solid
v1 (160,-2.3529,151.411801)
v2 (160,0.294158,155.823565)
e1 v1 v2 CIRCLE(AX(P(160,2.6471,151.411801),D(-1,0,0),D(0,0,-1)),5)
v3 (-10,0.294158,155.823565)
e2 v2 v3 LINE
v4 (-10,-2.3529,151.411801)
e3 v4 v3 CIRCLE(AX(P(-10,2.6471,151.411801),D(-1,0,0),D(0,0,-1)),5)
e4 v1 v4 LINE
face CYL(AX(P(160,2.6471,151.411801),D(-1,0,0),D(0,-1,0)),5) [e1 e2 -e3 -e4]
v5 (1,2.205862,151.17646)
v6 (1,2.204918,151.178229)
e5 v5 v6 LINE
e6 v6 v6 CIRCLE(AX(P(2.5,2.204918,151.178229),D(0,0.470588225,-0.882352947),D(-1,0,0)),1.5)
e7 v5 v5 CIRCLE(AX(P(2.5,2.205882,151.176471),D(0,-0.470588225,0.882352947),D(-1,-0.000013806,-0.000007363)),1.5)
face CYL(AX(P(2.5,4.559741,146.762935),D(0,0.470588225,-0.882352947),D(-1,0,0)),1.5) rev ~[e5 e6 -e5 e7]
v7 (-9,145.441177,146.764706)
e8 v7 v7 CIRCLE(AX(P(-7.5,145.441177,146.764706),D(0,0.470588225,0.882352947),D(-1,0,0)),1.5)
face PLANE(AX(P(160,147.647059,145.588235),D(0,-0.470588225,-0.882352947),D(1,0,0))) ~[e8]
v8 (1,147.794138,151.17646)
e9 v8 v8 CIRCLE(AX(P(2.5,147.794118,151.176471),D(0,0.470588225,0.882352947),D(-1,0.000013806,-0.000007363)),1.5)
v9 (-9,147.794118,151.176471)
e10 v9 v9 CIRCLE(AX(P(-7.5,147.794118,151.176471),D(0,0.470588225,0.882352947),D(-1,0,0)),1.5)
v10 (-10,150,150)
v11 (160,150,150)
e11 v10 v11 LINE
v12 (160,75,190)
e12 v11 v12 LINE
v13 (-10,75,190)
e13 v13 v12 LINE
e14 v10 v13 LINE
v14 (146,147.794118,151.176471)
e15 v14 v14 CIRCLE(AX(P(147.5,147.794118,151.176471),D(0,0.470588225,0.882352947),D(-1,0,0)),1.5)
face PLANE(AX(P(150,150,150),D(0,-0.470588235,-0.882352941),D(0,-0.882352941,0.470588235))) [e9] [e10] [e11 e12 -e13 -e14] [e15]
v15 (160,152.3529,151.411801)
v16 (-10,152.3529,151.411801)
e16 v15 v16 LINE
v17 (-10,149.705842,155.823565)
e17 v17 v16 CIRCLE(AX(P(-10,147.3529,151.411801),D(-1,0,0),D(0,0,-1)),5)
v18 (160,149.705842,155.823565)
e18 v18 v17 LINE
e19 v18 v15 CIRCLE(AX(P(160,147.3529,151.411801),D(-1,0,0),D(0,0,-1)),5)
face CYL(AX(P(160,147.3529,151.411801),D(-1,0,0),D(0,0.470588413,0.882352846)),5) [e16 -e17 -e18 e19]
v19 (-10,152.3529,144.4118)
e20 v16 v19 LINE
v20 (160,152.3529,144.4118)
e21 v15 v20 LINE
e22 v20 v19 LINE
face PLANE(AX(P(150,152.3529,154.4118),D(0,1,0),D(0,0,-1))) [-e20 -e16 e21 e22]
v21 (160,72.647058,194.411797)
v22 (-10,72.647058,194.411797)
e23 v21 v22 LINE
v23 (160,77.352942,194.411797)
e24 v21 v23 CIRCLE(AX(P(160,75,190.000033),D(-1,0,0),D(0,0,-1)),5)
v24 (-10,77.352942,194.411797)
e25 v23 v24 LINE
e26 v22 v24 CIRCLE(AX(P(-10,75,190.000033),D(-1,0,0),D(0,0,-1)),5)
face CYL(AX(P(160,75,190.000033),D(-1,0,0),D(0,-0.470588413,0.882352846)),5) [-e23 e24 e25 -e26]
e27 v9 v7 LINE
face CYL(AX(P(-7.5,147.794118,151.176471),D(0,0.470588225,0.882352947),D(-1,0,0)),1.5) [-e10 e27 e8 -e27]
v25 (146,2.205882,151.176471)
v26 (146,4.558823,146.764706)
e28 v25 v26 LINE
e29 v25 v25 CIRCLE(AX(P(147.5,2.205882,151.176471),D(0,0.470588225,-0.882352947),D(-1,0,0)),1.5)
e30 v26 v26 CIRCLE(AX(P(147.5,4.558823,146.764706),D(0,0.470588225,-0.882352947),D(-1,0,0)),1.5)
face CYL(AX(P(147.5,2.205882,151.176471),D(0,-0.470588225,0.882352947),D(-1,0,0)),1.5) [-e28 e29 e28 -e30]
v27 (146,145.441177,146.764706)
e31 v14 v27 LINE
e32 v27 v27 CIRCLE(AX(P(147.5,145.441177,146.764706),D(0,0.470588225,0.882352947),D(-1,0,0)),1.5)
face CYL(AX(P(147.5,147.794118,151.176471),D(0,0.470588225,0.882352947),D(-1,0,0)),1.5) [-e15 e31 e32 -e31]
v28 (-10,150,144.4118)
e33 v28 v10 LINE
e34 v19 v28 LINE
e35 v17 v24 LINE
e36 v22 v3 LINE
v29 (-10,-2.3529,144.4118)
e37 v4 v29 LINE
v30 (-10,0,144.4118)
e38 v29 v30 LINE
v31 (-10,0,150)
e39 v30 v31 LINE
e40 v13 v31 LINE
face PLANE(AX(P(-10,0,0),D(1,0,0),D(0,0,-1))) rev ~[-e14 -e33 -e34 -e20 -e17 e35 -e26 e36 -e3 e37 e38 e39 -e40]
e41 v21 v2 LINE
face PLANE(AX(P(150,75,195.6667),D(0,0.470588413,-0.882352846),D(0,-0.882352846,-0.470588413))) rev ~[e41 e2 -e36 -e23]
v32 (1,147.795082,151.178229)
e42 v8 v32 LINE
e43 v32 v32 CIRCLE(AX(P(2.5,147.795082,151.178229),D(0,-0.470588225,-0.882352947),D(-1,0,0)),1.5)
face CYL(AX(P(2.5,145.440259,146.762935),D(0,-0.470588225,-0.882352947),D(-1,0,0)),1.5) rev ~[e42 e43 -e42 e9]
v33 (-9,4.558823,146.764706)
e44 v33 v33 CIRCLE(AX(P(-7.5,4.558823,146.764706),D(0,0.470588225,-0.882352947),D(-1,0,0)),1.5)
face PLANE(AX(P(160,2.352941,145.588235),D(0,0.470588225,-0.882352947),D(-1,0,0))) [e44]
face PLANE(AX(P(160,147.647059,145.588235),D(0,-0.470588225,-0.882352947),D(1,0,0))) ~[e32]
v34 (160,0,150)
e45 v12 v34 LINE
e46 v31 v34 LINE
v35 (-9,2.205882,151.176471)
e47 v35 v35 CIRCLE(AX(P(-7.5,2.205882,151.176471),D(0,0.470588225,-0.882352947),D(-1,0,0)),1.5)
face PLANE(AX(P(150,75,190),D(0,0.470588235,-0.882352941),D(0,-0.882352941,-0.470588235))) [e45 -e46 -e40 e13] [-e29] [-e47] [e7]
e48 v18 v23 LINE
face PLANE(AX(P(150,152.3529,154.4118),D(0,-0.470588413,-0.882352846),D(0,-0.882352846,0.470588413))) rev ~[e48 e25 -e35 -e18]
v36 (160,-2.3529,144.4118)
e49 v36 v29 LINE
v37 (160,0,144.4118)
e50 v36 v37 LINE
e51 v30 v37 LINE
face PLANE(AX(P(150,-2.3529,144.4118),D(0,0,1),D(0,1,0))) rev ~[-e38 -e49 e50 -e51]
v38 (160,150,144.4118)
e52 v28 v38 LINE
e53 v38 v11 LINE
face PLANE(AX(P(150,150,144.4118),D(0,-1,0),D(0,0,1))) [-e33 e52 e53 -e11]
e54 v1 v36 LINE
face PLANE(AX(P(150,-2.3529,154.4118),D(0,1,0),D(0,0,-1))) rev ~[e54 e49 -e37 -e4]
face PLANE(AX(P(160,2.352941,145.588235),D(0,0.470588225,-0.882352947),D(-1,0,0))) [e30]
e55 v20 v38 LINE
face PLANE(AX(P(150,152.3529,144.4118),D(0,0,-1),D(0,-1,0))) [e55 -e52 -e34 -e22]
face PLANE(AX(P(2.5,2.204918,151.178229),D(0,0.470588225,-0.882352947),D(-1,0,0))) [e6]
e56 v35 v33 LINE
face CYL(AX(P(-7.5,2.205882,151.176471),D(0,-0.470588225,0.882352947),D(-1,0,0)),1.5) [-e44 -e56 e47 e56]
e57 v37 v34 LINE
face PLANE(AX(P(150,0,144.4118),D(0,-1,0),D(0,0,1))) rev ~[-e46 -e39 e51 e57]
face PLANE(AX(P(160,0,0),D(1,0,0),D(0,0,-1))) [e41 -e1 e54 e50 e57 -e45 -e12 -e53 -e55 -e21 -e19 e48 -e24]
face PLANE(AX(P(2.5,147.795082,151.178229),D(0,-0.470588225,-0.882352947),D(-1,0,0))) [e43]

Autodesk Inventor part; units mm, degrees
sketch "Boceto1" plane through (0, 0, 0) normal (0, 0, 1) x (1, 0, 0)
  line L0 (0, 0) -> (150, 0)
  line L1 (150, 0) -> (150, 150)
  line L2 (150, 150) -> (0, 150)
  line L3 (0, 150) -> (0, 0)
  line L4 (5, 145) -> (145, 145)
  line L5 (145, 145) -> (145, 5)
  line L6 (145, 5) -> (5, 5)
  line L7 (5, 5) -> (5, 145)
  dimension "d0" = 150
  dimension "d1" = 150
  dimension "d2" = 5
extrude "Extrusión1" add sketch "Boceto1" along normal blind 150
sketch "Boceto2" plane through (150, 0, 0) normal (1, 0, 0) x (0, 0, -1)
  line L0 (-150, 0) -> (-150, 150) projected
  line L1 (-150, 75) -> (-190, 75) construction
  line L2 (-190, 75) -> (-150, 150)
  line L3 (0, 0) -> (-150, 0) construction
  line L4 (-150, 0) -> (-190, 75)
  dimension "d5" = 40
extrude "Extrusión2" add sketch "Boceto2" against normal blind 5
ref_plane "Plano de trabajo1" through (75, 0, 0) normal (1, 0, 0) x (0, 0, -1)
mirror "Simetría1" about plane through (75, 0, 0) normal (1, 0, 0) of "Extrusión2"
sketch "Boceto3" plane through (0, 150, 0) normal (0, 1, 0) x (1, 0, 0)
  line L0 (105, -60) -> (45, -60)
  line L1 (45, -60) -> (45, -95)
  line L2 (60, -110) -> (90, -110)
  line L3 (105, -95) -> (105, -60)
  line L4 (150, 0) -> (0, 0) projected
  line L5 (145, -150) -> (5, -150) projected
  arc A0 (90, -110) -> (105, -95) centre (90, -95) ccw
  arc A1 (45, -95) -> (60, -110) centre (60, -95) ccw
  point P0 (45, -110)
  point P1 (105, -110)
  point P2 (75, -60)
  point P3 (75, 0)
  dimension "d8" = 60
  dimension "d9" = 50
  dimension "d10" = 40
  dimension "d11" = 15
extrude "Extrusión3" cut sketch "Boceto3" against normal through all
sketch "Boceto4" plane through (150, 0, 0) normal (1, 0, 0) x (0, 0, -1)
  line L0 (-13, 20) -> (-123, 20)
  line L1 (-128, 25) -> (-128, 75)
  line L2 (-123, 80) -> (-13, 80)
  line L3 (-8, 75) -> (-8, 25)
  line L4 (0, 0) -> (0, 150) projected
  line L5 (0, 0) -> (-150, 0) projected
  arc A0 (-123, 80) -> (-128, 75) centre (-123, 75) ccw
  arc A1 (-8, 75) -> (-13, 80) centre (-13, 75) ccw
  arc A2 (-13, 20) -> (-8, 25) centre (-13, 25) ccw
  arc A3 (-128, 25) -> (-123, 20) centre (-123, 25) ccw
  point P0 (-128, 80)
  point P1 (-128, 20)
  point P2 (-8, 80)
  dimension "d14" = 120
  dimension "d15" = 60
  dimension "d16" = 8
  dimension "d17" = 20
  dimension "d18" = 5
extrude "Extrusión4" cut sketch "Boceto4" against normal up to surface (5 mm away)
sketch "Boceto5" plane through (0, 0, 0) normal (-1, 0, 0) x (0, 0, 1)
  line L0 (65, 125) -> (115, 125)
  line L1 (120, 120) -> (120, 30)
  line L2 (115, 25) -> (65, 25)
  line L3 (60, 30) -> (60, 120)
  line L4 (0, 150) -> (0, 0) projected
  arc A0 (120, 120) -> (115, 125) centre (115, 120) ccw
  arc A1 (115, 25) -> (120, 30) centre (115, 30) ccw
  arc A2 (65, 125) -> (60, 120) centre (65, 120) ccw
  arc A3 (60, 30) -> (65, 25) centre (65, 30) ccw
  point P0 (60, 150)
  point P1 (120, 25)
  point P2 (120, 125)
  point P3 (60, 25)
  point P4 (60, 75)
  point P5 (0, 75)
  dimension "d21" = 60
  dimension "d22" = 100
  dimension "d23" = 60
  dimension "d24" = 5
extrude "Extrusión5" cut sketch "Boceto5" against normal blind 10
sketch "Boceto6" plane through (150, 0, 0) normal (1, 0, 0) x (0, 0, -1)
  line L0 (-190, 75) -> (-150, 0) projected
  line L1 (-150, 150) -> (-190, 75) projected
  line L2 (-154.4118, 152.3529) -> (-195.6667, 75)
  line L3 (-195.6667, 75) -> (-154.4118, -2.3529)
  line L4 (-154.4118, 152.3529) -> (-144.4118, 152.3529)
  line L5 (-144.4118, 152.3529) -> (-144.4118, 150)
  line L6 (-154.4118, -2.3529) -> (-144.4118, -2.3529)
  line L7 (-144.4118, -2.3529) -> (-144.4118, 0)
  line L8 (0, 0) -> (-150, 0) projected
  line L9 (0, 150) -> (-150, 150) projected
  dimension "d27" = 5
  dimension "d28" = 10
extrude "Extrusión6" add sketch "Boceto6" along normal blind 10 and the other way blind 160
fillet "Empalme1" radius 5 3 edges at (75, 152.3529, 154.4118) (75, 75, 195.6667) (75, -2.3529, 154.4118)
sketch "Boceto8" plane through (150, 0, 0) normal (1, 0, 0) x (0, 0, -1)
  arc A0 (-13, 20) -> (-8, 25) centre (-13, 25) ccw projected
  line L0 (-13, 20) -> (-123, 20) projected
  arc A1 (-128, 25) -> (-123, 20) centre (-123, 25) ccw projected
  line L1 (-128, 25) -> (-128, 75) projected
  arc A2 (-123, 80) -> (-128, 75) centre (-123, 75) ccw projected
  line L2 (-123, 80) -> (-13, 80) projected
  arc A3 (-8, 75) -> (-13, 80) centre (-13, 75) ccw projected
  line L3 (-8, 75) -> (-8, 25) projected
  line L4 (0, 0) -> (0, 150) projected
  line L5 (0, 150) -> (-144.4118, 150) projected
  line L6 (-144.4118, 150) -> (-150, 150) projected
  line L7 (-150, 150) -> (-190, 75) projected
  line L8 (-190, 75) -> (-150, 0) projected
  line L9 (-144.4118, 0) -> (-150, 0) projected
  line L10 (0, 0) -> (-144.4118, 0) projected
  point P0 (0, 0)
extrude "Extrusión8" cut sketch "Boceto8" against normal through all contours L0 A1 L1 A2 L2 A3 L3 A0 | L10 L9 L8 L7 L6 L5 L4
sketch "Boceto9" plane through (160, 0, 150) normal (0, 0.4705882, -0.8823529) x (-1, 0, 0)
  circle A0 centre (12.5, 2.5) radius 1.5
  line L0 (0, 0) -> (0, 85) projected
  line L1 (170, 0) -> (0, 0) projected
  point P0 (160, -70.5882)
  dimension "d41" = 3
  dimension "d42" = 12.5
  dimension "d43" = 2.5
extrude "Extrusión9" add sketch "Boceto9" along normal blind 5
ref_plane "Plano de trabajo3" through (75, 0, 0) normal (1, 0, 0) x (0, 0, -1)
mirror "Simetría3" about plane through (75, 0, 0) normal (1, 0, 0) of "Extrusión9"
ref_plane "Plano de trabajo5" through (-10, 75, 144.4118) normal (0, -1, 0) x (1, 0, 0)
mirror "Simetría4" about plane through (-10, 75, 144.4118) normal (0, -1, 0) of "Extrusión9", "Simetría3"
sketch "Boceto10" plane through (160, 0, 150) normal (0, 0.4705882, -0.8823529) x (-1, 0, 0)
  circle A0 centre (167.5, 2.5) radius 1.5
  line L0 (170, 0) -> (0, 0) projected
  line L1 (170, 85) -> (170, 0) projected
  line L2 (0, 85) -> (170, 85) projected
  point P0 (160, -70.5882)
  dimension "d46" = 3
  dimension "d47" = 2.5
  dimension "d48" = 2.5
extrude "Extrusión10" add sketch "Boceto10" along normal blind 5
mirror "Simetría5" about plane through (-10, 75, 144.4118) normal (0, -1, 0) of "Extrusión10"
sketch "Boceto11" plane through (2.5, 4.5588, 146.7647) normal (0, 0.4705882, -0.8823529) x (-1, 0, 0)
  circle A0 centre (0, 0) radius 1.5 projected
  point P0 (2.5, -73.0882)
extrude "Extrusión11" cut sketch "Boceto11" against normal blind 5
sketch "Boceto12" plane through (2.5, 145.4412, 146.7647) normal (0, -0.4705882, -0.8823529) x (-1, 0, 0)
  circle A0 centre (0, 0) radius 1.5 projected
  point P0 (2.5, -59.2647)
extrude "Extrusión12" cut sketch "Boceto12" against normal blind 5
properties part number "TechoCasa" material "Plástico ABS"
